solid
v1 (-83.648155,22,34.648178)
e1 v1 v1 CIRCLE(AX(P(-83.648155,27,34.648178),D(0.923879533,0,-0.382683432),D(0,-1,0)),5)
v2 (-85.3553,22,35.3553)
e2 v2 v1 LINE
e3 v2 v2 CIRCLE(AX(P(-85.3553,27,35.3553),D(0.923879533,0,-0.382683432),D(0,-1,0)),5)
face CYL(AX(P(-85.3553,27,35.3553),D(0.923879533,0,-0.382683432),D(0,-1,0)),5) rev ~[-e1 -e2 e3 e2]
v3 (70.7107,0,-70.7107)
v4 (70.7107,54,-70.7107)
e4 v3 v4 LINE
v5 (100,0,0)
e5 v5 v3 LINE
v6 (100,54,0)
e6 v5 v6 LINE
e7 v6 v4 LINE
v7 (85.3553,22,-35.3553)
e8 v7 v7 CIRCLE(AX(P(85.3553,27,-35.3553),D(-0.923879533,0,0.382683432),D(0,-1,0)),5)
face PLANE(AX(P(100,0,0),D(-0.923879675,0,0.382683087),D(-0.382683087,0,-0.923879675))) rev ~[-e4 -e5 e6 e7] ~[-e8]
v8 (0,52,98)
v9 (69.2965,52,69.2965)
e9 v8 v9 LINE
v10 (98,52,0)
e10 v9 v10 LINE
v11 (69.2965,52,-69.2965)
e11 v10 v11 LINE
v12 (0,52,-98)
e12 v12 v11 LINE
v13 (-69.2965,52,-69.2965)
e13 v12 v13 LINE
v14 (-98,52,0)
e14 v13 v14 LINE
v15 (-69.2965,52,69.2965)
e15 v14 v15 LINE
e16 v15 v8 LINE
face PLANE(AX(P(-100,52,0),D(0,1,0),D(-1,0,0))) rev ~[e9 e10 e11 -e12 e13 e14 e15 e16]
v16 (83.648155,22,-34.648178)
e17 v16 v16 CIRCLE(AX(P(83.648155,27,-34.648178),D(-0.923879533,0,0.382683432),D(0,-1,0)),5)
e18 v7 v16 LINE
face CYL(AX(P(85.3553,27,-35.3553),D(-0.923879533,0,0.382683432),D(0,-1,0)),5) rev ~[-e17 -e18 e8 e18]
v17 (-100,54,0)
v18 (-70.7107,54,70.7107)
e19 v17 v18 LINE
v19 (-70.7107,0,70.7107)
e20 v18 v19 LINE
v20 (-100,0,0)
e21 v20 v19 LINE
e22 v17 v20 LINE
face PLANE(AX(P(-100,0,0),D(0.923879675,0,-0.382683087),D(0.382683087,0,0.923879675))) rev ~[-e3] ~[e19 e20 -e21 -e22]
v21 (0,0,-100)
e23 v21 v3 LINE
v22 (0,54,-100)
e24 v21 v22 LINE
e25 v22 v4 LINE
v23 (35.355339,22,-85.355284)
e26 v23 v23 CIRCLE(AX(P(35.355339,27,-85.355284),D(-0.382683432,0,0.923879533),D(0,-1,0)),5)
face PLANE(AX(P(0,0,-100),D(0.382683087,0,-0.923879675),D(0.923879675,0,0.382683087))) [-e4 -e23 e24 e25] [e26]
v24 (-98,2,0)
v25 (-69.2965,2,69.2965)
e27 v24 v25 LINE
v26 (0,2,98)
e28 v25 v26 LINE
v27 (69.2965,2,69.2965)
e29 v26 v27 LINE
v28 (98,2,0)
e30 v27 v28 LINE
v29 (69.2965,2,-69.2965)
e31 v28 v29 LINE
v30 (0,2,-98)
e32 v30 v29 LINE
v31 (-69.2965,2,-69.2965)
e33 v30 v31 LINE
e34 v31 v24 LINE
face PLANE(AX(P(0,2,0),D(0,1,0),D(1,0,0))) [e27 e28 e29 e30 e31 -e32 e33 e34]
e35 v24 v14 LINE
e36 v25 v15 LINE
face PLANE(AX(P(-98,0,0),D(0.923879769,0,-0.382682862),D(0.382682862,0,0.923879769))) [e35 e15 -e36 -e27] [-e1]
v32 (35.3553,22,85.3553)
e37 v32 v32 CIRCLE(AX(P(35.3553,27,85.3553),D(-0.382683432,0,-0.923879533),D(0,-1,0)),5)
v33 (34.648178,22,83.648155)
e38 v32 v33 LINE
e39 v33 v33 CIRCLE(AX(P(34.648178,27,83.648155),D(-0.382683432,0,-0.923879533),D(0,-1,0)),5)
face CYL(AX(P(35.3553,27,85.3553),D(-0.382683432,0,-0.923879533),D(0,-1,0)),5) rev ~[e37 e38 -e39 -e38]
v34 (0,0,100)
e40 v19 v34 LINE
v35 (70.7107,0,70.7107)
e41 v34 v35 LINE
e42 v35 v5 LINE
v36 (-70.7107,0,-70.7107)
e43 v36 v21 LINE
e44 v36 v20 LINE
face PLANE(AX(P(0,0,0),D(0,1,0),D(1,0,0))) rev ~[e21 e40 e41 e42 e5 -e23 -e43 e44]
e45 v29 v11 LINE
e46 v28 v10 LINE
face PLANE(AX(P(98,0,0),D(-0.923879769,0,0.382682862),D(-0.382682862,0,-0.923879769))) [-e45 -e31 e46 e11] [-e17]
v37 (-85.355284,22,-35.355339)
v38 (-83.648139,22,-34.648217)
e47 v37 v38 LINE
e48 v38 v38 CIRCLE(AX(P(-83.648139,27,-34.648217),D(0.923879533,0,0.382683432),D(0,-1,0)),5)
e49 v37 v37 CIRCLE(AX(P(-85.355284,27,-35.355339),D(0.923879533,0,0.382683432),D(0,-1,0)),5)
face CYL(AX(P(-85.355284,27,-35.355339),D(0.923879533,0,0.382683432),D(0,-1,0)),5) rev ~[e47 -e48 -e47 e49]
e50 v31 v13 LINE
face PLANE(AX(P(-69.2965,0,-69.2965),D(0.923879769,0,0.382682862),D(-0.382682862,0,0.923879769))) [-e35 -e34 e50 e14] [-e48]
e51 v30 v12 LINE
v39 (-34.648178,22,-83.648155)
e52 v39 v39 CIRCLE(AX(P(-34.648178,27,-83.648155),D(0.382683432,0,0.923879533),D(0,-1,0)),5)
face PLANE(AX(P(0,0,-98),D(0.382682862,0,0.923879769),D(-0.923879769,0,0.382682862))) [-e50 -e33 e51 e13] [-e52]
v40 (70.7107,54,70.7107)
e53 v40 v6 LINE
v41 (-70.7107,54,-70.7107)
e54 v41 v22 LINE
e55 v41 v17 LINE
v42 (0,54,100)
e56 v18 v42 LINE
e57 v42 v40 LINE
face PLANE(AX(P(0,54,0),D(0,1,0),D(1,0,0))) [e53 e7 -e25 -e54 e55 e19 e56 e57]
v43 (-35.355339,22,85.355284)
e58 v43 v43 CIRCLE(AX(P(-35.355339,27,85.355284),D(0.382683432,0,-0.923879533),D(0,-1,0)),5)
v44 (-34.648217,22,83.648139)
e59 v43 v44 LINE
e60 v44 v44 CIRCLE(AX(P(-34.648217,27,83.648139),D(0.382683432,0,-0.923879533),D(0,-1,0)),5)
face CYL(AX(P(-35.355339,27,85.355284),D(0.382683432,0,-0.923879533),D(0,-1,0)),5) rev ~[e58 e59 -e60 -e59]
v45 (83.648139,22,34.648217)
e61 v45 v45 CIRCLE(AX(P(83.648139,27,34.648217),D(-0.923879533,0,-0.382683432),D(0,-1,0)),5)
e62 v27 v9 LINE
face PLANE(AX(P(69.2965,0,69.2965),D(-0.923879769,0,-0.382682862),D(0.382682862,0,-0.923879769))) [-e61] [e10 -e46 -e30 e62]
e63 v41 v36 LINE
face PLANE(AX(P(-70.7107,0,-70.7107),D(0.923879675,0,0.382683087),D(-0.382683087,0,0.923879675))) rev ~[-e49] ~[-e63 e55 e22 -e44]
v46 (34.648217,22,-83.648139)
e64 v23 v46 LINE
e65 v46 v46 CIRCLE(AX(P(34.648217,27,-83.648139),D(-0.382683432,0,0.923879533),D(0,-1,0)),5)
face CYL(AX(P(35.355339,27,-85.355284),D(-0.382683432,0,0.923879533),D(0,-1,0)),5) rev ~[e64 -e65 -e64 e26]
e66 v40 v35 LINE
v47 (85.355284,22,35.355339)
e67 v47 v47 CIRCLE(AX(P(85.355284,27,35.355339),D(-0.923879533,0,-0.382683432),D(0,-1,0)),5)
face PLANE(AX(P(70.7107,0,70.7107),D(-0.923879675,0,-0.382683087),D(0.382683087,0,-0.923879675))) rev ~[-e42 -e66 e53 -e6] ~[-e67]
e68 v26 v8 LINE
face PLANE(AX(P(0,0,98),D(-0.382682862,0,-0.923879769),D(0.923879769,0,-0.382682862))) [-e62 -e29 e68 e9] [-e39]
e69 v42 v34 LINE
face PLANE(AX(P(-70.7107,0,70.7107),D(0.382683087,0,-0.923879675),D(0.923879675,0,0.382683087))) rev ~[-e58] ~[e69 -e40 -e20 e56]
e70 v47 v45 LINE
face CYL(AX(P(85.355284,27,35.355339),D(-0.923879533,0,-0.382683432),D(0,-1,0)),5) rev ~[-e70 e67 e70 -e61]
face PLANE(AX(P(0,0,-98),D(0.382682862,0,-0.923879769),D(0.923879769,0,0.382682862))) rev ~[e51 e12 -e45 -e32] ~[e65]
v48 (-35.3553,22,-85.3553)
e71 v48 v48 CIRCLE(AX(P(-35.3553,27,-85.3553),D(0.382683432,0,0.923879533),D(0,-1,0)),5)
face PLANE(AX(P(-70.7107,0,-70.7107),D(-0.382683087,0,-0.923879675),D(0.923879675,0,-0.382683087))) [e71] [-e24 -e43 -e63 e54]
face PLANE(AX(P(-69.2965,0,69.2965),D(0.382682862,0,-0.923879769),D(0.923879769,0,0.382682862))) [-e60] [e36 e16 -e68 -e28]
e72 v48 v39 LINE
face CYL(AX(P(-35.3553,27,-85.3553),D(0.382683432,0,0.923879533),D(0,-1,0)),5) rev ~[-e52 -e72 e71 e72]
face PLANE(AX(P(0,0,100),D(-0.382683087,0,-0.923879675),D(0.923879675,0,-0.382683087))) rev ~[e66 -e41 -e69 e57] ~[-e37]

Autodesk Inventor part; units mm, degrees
ref_plane "YZ Plane" through (0, 0, 0) normal (1, 0, 0) x (0, 1, 0)
ref_plane "XY Plane" through (0, 0, 0) normal (0, 0, 1) x (1, 0, 0)
sketch "Sketch1" plane through (0, 0, 0) normal (0, 1, 0) x (1, 0, 0)
  line L0 (70.7107, 70.7107) -> (-70.7107, -70.7107) construction
  line L1 (-70.7107, 70.7107) -> (70.7107, -70.7107) construction
  line L2 (-140, 0) -> (140, 0) construction
  line L3 (0, -140) -> (0, 140) construction
  line L4 (100, 0) -> (70.7107, 70.7107)
  line L5 (0, 100) -> (70.7107, 70.7107)
  line L6 (-70.7107, 70.7107) -> (0, 100)
  line L7 (-70.7107, 70.7107) -> (-100, 0)
  line L8 (-100, 0) -> (-70.7107, -70.7107)
  line L9 (-70.7107, -70.7107) -> (0, -100)
  line L10 (0, -100) -> (70.7107, -70.7107)
  line L11 (70.7107, -70.7107) -> (100, 0)
  line L12 (0, 100) -> (0, -100) construction
  line L13 (-100, 0) -> (100, 0) construction
  line L14 (98, 0) -> (69.2965, 69.2965)
  line L15 (0, 98) -> (69.2965, 69.2965)
  line L16 (0, 98) -> (-69.2965, 69.2965)
  line L17 (-69.2965, 69.2965) -> (-98, 0)
  line L18 (-98, 0) -> (-69.2965, -69.2965)
  line L19 (-69.2965, -69.2965) -> (0, -98)
  line L20 (0, -98) -> (69.2965, -69.2965)
  line L21 (69.2965, -69.2965) -> (98, 0)
  point P0 (0, 0)
  point P1 (0, 0)
  dimension "d0" = 45
  dimension "d3" = 200
  dimension "d6" = 2
extrude "Extrusion1" add sketch "Sketch1" along normal blind 54
extrude "Extrusion2" add sketch "Sketch1" along normal blind 2 contours L11 L10 L9 L8 L7 L6 L5 L4 | L21 L20 L19 L18 L17 L16 L15 L14
ref_plane "Work Plane4" through (-100, 54, 0) normal (0, 1, 0) x (-1, 0, 0)
sketch "Sketch3" plane through (-100, 54, 0) normal (0, 1, 0) x (-1, 0, 0)
  line L0 (-29.2893, -70.7107) -> (0, 0) projected
  line L1 (-100, -100) -> (-29.2893, -70.7107) projected
  line L2 (-170.7107, -70.7107) -> (-100, -100) projected
  line L3 (-200, 0) -> (-170.7107, -70.7107) projected
  line L4 (-170.7107, 70.7107) -> (-200, 0) projected
  line L5 (-100, 100) -> (-170.7107, 70.7107) projected
  line L6 (-29.2893, 70.7107) -> (-100, 100) projected
  line L7 (0, 0) -> (-29.2893, 70.7107) projected
  point P0 (-100, 0)
extrude "Extrusion4" add sketch "Sketch3" against normal blind 2
sketch "Sketch4" plane through (0, 0, 100) normal (0.3826834, 0, 0.9238795) x (0.9238795, 0, -0.3826834)
  line L0 (76.5367, 54) -> (0, 54) projected
  line L1 (38.2683, 54) -> (38.2683, 0) construction
  line L2 (76.5367, 0) -> (0, 0) projected
  line L3 (75.7713, 2) -> (0.7654, 2) construction
  point P0 (38.2683, 27)
  dimension "d15" = 25
hole "Hole1" at (35.3553, 27, 85.3553) direction (-0.3826834, 0, -0.9238795) diameter 10 depth 1.8478
pattern_circular "Circular Pattern1" count 8 over 360 about axis through (0, -10, 0) along (0, 1, 0) of "Hole1"
equation "\"d3\" = diameter"
equation "\"d6\" = thickness"
equation "\"d7\" = outher_heigth"
equation "\"d9\" = thickness"
equation "\"d13\" = thickness"
equation "\"d15\" = hole_pos_y"
equation "\"d16\" = hole_diameter"
equation "\"diameter\" = 200"
equation "\"inner_diameter\" = diameter - 2 * thickness"
equation "\"thickness\" = 2"
equation "\"inner_heigth\" = 50"
equation "\"outher_heigth\" = inner_heigth + 2 * thickness"
equation "\"hole_pos_y\" = 0.5 * inner_heigth"
equation "\"hole_diameter\" = 10"
properties part number "board_case" material "PVC, Unplasticized"
